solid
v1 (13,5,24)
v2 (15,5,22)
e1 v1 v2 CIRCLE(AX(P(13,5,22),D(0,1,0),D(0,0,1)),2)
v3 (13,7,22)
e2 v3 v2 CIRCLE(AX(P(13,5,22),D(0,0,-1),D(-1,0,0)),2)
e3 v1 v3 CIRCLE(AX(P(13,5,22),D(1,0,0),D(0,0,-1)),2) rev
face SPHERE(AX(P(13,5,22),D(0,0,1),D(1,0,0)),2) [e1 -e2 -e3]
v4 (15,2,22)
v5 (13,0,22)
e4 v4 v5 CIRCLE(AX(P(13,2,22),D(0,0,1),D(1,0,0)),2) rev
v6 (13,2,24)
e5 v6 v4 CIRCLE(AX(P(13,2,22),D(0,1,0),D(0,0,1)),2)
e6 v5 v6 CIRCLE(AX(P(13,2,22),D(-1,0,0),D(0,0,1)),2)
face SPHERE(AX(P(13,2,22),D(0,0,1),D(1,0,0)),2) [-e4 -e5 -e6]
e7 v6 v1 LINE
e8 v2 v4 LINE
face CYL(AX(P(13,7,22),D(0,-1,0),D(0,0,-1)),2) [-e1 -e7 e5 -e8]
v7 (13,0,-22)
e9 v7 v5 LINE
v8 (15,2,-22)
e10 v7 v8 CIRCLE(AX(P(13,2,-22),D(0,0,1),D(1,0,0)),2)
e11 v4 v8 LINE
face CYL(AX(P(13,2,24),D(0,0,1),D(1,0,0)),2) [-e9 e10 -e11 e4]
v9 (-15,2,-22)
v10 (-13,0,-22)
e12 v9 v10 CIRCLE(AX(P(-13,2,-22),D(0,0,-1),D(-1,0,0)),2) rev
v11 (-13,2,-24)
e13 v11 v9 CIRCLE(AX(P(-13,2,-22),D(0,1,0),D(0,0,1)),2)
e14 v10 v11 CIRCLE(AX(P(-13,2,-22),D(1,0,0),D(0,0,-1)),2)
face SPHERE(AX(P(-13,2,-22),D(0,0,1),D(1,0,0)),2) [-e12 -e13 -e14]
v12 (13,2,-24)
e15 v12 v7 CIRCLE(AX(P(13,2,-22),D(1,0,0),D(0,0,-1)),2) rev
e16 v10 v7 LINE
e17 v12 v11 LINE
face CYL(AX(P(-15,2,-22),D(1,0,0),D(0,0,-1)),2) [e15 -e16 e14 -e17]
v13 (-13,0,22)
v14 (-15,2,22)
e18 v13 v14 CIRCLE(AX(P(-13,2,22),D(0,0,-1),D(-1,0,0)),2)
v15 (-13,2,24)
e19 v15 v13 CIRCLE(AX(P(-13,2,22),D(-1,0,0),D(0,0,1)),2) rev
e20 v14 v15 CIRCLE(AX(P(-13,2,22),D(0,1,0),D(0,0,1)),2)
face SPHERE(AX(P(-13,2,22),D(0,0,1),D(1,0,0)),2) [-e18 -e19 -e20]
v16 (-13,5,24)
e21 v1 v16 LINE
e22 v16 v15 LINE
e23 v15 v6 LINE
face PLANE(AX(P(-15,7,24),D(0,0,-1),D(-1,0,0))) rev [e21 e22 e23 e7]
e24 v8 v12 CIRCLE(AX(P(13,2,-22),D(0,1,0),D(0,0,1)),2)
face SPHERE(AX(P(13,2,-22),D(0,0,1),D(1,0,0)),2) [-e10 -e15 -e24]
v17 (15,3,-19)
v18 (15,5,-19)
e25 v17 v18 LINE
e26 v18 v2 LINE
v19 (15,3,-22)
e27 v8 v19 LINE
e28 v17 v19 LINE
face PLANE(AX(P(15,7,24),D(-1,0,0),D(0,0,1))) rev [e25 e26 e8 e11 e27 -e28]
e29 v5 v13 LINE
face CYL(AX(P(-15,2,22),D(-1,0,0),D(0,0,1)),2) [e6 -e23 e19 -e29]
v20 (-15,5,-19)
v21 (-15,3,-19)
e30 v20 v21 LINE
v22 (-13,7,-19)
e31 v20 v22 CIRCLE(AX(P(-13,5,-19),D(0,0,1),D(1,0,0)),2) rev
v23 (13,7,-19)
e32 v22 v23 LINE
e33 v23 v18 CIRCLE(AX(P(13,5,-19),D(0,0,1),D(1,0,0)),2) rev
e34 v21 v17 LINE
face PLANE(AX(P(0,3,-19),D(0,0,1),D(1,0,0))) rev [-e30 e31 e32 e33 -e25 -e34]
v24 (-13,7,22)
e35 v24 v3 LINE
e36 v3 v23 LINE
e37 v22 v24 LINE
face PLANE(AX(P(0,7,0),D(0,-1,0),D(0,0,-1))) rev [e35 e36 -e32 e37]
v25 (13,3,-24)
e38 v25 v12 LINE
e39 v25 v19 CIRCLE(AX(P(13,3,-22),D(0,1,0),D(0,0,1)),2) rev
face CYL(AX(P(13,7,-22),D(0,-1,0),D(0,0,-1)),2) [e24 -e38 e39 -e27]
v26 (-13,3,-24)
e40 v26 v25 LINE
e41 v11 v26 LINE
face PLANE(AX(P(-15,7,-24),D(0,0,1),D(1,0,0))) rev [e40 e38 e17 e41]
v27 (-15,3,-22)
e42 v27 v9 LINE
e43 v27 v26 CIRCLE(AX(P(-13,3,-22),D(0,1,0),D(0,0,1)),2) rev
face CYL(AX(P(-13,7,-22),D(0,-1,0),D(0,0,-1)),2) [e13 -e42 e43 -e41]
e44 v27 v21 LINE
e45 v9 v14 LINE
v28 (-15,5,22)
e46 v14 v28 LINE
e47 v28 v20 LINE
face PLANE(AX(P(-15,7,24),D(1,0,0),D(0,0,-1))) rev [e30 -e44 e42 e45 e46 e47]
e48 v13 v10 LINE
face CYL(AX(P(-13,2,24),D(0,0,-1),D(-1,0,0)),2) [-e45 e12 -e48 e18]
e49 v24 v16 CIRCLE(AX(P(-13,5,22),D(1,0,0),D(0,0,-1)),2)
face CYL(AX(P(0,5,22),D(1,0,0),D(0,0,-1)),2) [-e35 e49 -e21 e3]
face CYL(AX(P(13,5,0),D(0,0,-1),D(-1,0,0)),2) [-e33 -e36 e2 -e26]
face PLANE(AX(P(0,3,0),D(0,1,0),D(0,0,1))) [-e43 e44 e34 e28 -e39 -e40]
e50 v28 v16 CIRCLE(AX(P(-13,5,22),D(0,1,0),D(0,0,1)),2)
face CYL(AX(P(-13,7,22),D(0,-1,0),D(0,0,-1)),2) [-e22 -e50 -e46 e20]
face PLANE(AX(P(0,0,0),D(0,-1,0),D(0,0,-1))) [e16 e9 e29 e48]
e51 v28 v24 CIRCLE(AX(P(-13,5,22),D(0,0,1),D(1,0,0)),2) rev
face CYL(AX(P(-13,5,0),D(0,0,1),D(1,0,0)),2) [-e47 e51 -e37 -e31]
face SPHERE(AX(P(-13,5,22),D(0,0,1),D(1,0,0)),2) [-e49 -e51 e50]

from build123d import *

# Parameters (mm, degrees)
SKETCH_1_W          = 30
SKETCH_1_H          = 48
EXTRUDE_1_DEPTH     = 7
FILLET_1_R          = 2
FILLET_2_R          = 2
SKETCH_2_W          = 26
SKETCH_2_H          = 3
CUT_EXTRUDE_1_DEPTH = 4


with BuildPart() as part:
    # Эскиз1 → Бобышка-Вытянуть1 (new body)
    with BuildSketch(Plane(origin=(0, 0, 0), x_dir=(1, 0, 0), z_dir=(0, 1, 0))):
        Rectangle(SKETCH_1_W, SKETCH_1_H)
    extrude(amount=EXTRUDE_1_DEPTH)

    # Скругление1
    fillet_1_edges = [part.edges().sort_by_distance(p)[0] for p in [
        (-15, 7, 0),
        (0, 7, 24),
        (15, 7, 0),
        (0, 0, 24),
        (-15, 0, 0),
        (0, 0, -24),
        (15, 0, 0),
        (0, 7, -24),
    ]]
    fillet(fillet_1_edges, radius=FILLET_1_R)

    # Скругление2
    # the kernel refuses this fillet: 2 mm, written as the material it takes off along each edge
    with BuildSketch(Plane(origin=(13, 2, 22), x_dir=(1, 0, 0), z_dir=(0, 0, 1))) as fillet_2_piece_1_section:
        Polygon((0, 0), (FILLET_2_R, 0), (FILLET_2_R, -FILLET_2_R), (0, -FILLET_2_R), align=None)
    fillet_2_piece_1 = extrude(amount=FILLET_2_R, mode=Mode.PRIVATE)
    fillet_2_piece_1 = fillet_2_piece_1 - Plane(origin=(13, 2, 22), x_dir=(-0.7071067811865475, 0.7071067811865475, 0), z_dir=(0, 0, 1)) * Sphere(FILLET_2_R, mode=Mode.PRIVATE)
    add(fillet_2_piece_1, mode=Mode.SUBTRACT)
    with BuildSketch(Plane(origin=(-13, 2, 22), x_dir=(-1, 0, 0), z_dir=(0, 0, 1))) as fillet_2_piece_2_section:
        Polygon((0, 0), (FILLET_2_R, 0), (FILLET_2_R, FILLET_2_R), (0, FILLET_2_R), align=None)
    fillet_2_piece_2 = extrude(amount=FILLET_2_R, mode=Mode.PRIVATE)
    fillet_2_piece_2 = fillet_2_piece_2 - Plane(origin=(-13, 2, 22), x_dir=(0.7071067811865475, 0.7071067811865475, 0), z_dir=(0, 0, 1)) * Sphere(FILLET_2_R, mode=Mode.PRIVATE)
    add(fillet_2_piece_2, mode=Mode.SUBTRACT)
    with BuildSketch(Plane(origin=(13, 2, -22), x_dir=(0, 0, -1), z_dir=(1, 0, 0))) as fillet_2_piece_3_section:
        Polygon((0, 0), (FILLET_2_R, 0), (FILLET_2_R, -FILLET_2_R), (0, -FILLET_2_R), align=None)
    fillet_2_piece_3 = extrude(amount=FILLET_2_R, mode=Mode.PRIVATE)
    fillet_2_piece_3 = fillet_2_piece_3 - Plane(origin=(13, 2, -22), x_dir=(0, 0.7071067811865475, 0.7071067811865475), z_dir=(1, 0, 0)) * Sphere(FILLET_2_R, mode=Mode.PRIVATE)
    add(fillet_2_piece_3, mode=Mode.SUBTRACT)
    with BuildSketch(Plane(origin=(-13, 2, -22), x_dir=(0, 0, -1), z_dir=(-1, 0, 0))) as fillet_2_piece_4_section:
        Polygon((0, 0), (FILLET_2_R, 0), (FILLET_2_R, FILLET_2_R), (0, FILLET_2_R), align=None)
    fillet_2_piece_4 = extrude(amount=FILLET_2_R, mode=Mode.PRIVATE)
    fillet_2_piece_4 = fillet_2_piece_4 - Plane(origin=(-13, 2, -22), x_dir=(0, 0.7071067811865475, 0.7071067811865475), z_dir=(-1, 0, 0)) * Sphere(FILLET_2_R, mode=Mode.PRIVATE)
    add(fillet_2_piece_4, mode=Mode.SUBTRACT)
    with BuildSketch(Plane(origin=(-13, 5, -22), x_dir=(0, 0, -1), z_dir=(-1, 0, 0))) as fillet_2_piece_5_section:
        Polygon((0, 0), (FILLET_2_R, 0), (FILLET_2_R, -FILLET_2_R), (0, -FILLET_2_R), align=None)
    fillet_2_piece_5 = extrude(amount=FILLET_2_R, mode=Mode.PRIVATE)
    fillet_2_piece_5 = fillet_2_piece_5 - Plane(origin=(-13, 5, -22), x_dir=(0, -0.7071067811865475, 0.7071067811865475), z_dir=(-1, 0, 0)) * Sphere(FILLET_2_R, mode=Mode.PRIVATE)
    add(fillet_2_piece_5, mode=Mode.SUBTRACT)
    with BuildSketch(Plane(origin=(13, 5, -22), x_dir=(0, 0, -1), z_dir=(1, 0, 0))) as fillet_2_piece_6_section:
        Polygon((0, 0), (FILLET_2_R, 0), (FILLET_2_R, FILLET_2_R), (0, FILLET_2_R), align=None)
    fillet_2_piece_6 = extrude(amount=FILLET_2_R, mode=Mode.PRIVATE)
    fillet_2_piece_6 = fillet_2_piece_6 - Plane(origin=(13, 5, -22), x_dir=(0, -0.7071067811865475, 0.7071067811865475), z_dir=(1, 0, 0)) * Sphere(FILLET_2_R, mode=Mode.PRIVATE)
    add(fillet_2_piece_6, mode=Mode.SUBTRACT)
    with BuildSketch(Plane(origin=(-13, 5, 22), x_dir=(-1, 0, 0), z_dir=(0, 0, 1))) as fillet_2_piece_7_section:
        Polygon((0, 0), (FILLET_2_R, 0), (FILLET_2_R, -FILLET_2_R), (0, -FILLET_2_R), align=None)
    fillet_2_piece_7 = extrude(amount=FILLET_2_R, mode=Mode.PRIVATE)
    fillet_2_piece_7 = fillet_2_piece_7 - Plane(origin=(-13, 5, 22), x_dir=(0.7071067811865475, -0.7071067811865475, 0), z_dir=(0, 0, 1)) * Sphere(FILLET_2_R, mode=Mode.PRIVATE)
    add(fillet_2_piece_7, mode=Mode.SUBTRACT)
    with BuildSketch(Plane(origin=(13, 5, 22), x_dir=(1, 0, 0), z_dir=(0, 0, 1))) as fillet_2_piece_8_section:
        Polygon((0, 0), (FILLET_2_R, 0), (FILLET_2_R, FILLET_2_R), (0, FILLET_2_R), align=None)
    fillet_2_piece_8 = extrude(amount=FILLET_2_R, mode=Mode.PRIVATE)
    fillet_2_piece_8 = fillet_2_piece_8 - Plane(origin=(13, 5, 22), x_dir=(-0.7071067811865475, -0.7071067811865475, 0), z_dir=(0, 0, 1)) * Sphere(FILLET_2_R, mode=Mode.PRIVATE)
    add(fillet_2_piece_8, mode=Mode.SUBTRACT)
    with BuildSketch(Plane(origin=(-15, 2, -24), x_dir=(0, 0, 1), z_dir=(0, 1, 0)), Plane(origin=(-15, 2, 24), x_dir=(1, 0, 0), z_dir=(0, 1, 0))) as fillet_2_piece_9:
        with BuildLine():
            CenterArc((FILLET_2_R, FILLET_2_R), FILLET_2_R, 180, 90)
            Line((0, FILLET_2_R), (0, 0))
            Line((0, 0), (FILLET_2_R, 0))
        make_face()
    extrude(amount=3, mode=Mode.SUBTRACT)
    with BuildSketch(Plane(origin=(15, 2, -24), x_dir=(0, 0, 1), z_dir=(0, 1, 0)), Plane(origin=(15, 2, 24), x_dir=(-1, 0, 0), z_dir=(0, 1, 0))) as fillet_2_piece_10:
        with BuildLine():
            CenterArc((FILLET_2_R, -FILLET_2_R), FILLET_2_R, 90, 90)
            Line((0, -FILLET_2_R), (0, 0))
            Line((0, 0), (FILLET_2_R, 0))
        make_face()
    extrude(amount=3, mode=Mode.SUBTRACT)

    # Эскиз2 → Вырез-Вытянуть1 (cut)
    with BuildSketch(Plane(origin=(0, 7, 0), x_dir=(1, 0, 0), z_dir=(0, 1, 0))):
        with Locations((0, 20.5)):
            Rectangle(SKETCH_2_W, SKETCH_2_H)
        Polygon((-13, 24), (-15.574798144, 24), (-15.574798144, 19), (-13, 19), (-13, 22), (13, 22), (13, 19), (18.278986273, 19), (18.278986273, 24), (13, 24), align=None)
    extrude(amount=-CUT_EXTRUDE_1_DEPTH, mode=Mode.SUBTRACT)


solid = part.part
